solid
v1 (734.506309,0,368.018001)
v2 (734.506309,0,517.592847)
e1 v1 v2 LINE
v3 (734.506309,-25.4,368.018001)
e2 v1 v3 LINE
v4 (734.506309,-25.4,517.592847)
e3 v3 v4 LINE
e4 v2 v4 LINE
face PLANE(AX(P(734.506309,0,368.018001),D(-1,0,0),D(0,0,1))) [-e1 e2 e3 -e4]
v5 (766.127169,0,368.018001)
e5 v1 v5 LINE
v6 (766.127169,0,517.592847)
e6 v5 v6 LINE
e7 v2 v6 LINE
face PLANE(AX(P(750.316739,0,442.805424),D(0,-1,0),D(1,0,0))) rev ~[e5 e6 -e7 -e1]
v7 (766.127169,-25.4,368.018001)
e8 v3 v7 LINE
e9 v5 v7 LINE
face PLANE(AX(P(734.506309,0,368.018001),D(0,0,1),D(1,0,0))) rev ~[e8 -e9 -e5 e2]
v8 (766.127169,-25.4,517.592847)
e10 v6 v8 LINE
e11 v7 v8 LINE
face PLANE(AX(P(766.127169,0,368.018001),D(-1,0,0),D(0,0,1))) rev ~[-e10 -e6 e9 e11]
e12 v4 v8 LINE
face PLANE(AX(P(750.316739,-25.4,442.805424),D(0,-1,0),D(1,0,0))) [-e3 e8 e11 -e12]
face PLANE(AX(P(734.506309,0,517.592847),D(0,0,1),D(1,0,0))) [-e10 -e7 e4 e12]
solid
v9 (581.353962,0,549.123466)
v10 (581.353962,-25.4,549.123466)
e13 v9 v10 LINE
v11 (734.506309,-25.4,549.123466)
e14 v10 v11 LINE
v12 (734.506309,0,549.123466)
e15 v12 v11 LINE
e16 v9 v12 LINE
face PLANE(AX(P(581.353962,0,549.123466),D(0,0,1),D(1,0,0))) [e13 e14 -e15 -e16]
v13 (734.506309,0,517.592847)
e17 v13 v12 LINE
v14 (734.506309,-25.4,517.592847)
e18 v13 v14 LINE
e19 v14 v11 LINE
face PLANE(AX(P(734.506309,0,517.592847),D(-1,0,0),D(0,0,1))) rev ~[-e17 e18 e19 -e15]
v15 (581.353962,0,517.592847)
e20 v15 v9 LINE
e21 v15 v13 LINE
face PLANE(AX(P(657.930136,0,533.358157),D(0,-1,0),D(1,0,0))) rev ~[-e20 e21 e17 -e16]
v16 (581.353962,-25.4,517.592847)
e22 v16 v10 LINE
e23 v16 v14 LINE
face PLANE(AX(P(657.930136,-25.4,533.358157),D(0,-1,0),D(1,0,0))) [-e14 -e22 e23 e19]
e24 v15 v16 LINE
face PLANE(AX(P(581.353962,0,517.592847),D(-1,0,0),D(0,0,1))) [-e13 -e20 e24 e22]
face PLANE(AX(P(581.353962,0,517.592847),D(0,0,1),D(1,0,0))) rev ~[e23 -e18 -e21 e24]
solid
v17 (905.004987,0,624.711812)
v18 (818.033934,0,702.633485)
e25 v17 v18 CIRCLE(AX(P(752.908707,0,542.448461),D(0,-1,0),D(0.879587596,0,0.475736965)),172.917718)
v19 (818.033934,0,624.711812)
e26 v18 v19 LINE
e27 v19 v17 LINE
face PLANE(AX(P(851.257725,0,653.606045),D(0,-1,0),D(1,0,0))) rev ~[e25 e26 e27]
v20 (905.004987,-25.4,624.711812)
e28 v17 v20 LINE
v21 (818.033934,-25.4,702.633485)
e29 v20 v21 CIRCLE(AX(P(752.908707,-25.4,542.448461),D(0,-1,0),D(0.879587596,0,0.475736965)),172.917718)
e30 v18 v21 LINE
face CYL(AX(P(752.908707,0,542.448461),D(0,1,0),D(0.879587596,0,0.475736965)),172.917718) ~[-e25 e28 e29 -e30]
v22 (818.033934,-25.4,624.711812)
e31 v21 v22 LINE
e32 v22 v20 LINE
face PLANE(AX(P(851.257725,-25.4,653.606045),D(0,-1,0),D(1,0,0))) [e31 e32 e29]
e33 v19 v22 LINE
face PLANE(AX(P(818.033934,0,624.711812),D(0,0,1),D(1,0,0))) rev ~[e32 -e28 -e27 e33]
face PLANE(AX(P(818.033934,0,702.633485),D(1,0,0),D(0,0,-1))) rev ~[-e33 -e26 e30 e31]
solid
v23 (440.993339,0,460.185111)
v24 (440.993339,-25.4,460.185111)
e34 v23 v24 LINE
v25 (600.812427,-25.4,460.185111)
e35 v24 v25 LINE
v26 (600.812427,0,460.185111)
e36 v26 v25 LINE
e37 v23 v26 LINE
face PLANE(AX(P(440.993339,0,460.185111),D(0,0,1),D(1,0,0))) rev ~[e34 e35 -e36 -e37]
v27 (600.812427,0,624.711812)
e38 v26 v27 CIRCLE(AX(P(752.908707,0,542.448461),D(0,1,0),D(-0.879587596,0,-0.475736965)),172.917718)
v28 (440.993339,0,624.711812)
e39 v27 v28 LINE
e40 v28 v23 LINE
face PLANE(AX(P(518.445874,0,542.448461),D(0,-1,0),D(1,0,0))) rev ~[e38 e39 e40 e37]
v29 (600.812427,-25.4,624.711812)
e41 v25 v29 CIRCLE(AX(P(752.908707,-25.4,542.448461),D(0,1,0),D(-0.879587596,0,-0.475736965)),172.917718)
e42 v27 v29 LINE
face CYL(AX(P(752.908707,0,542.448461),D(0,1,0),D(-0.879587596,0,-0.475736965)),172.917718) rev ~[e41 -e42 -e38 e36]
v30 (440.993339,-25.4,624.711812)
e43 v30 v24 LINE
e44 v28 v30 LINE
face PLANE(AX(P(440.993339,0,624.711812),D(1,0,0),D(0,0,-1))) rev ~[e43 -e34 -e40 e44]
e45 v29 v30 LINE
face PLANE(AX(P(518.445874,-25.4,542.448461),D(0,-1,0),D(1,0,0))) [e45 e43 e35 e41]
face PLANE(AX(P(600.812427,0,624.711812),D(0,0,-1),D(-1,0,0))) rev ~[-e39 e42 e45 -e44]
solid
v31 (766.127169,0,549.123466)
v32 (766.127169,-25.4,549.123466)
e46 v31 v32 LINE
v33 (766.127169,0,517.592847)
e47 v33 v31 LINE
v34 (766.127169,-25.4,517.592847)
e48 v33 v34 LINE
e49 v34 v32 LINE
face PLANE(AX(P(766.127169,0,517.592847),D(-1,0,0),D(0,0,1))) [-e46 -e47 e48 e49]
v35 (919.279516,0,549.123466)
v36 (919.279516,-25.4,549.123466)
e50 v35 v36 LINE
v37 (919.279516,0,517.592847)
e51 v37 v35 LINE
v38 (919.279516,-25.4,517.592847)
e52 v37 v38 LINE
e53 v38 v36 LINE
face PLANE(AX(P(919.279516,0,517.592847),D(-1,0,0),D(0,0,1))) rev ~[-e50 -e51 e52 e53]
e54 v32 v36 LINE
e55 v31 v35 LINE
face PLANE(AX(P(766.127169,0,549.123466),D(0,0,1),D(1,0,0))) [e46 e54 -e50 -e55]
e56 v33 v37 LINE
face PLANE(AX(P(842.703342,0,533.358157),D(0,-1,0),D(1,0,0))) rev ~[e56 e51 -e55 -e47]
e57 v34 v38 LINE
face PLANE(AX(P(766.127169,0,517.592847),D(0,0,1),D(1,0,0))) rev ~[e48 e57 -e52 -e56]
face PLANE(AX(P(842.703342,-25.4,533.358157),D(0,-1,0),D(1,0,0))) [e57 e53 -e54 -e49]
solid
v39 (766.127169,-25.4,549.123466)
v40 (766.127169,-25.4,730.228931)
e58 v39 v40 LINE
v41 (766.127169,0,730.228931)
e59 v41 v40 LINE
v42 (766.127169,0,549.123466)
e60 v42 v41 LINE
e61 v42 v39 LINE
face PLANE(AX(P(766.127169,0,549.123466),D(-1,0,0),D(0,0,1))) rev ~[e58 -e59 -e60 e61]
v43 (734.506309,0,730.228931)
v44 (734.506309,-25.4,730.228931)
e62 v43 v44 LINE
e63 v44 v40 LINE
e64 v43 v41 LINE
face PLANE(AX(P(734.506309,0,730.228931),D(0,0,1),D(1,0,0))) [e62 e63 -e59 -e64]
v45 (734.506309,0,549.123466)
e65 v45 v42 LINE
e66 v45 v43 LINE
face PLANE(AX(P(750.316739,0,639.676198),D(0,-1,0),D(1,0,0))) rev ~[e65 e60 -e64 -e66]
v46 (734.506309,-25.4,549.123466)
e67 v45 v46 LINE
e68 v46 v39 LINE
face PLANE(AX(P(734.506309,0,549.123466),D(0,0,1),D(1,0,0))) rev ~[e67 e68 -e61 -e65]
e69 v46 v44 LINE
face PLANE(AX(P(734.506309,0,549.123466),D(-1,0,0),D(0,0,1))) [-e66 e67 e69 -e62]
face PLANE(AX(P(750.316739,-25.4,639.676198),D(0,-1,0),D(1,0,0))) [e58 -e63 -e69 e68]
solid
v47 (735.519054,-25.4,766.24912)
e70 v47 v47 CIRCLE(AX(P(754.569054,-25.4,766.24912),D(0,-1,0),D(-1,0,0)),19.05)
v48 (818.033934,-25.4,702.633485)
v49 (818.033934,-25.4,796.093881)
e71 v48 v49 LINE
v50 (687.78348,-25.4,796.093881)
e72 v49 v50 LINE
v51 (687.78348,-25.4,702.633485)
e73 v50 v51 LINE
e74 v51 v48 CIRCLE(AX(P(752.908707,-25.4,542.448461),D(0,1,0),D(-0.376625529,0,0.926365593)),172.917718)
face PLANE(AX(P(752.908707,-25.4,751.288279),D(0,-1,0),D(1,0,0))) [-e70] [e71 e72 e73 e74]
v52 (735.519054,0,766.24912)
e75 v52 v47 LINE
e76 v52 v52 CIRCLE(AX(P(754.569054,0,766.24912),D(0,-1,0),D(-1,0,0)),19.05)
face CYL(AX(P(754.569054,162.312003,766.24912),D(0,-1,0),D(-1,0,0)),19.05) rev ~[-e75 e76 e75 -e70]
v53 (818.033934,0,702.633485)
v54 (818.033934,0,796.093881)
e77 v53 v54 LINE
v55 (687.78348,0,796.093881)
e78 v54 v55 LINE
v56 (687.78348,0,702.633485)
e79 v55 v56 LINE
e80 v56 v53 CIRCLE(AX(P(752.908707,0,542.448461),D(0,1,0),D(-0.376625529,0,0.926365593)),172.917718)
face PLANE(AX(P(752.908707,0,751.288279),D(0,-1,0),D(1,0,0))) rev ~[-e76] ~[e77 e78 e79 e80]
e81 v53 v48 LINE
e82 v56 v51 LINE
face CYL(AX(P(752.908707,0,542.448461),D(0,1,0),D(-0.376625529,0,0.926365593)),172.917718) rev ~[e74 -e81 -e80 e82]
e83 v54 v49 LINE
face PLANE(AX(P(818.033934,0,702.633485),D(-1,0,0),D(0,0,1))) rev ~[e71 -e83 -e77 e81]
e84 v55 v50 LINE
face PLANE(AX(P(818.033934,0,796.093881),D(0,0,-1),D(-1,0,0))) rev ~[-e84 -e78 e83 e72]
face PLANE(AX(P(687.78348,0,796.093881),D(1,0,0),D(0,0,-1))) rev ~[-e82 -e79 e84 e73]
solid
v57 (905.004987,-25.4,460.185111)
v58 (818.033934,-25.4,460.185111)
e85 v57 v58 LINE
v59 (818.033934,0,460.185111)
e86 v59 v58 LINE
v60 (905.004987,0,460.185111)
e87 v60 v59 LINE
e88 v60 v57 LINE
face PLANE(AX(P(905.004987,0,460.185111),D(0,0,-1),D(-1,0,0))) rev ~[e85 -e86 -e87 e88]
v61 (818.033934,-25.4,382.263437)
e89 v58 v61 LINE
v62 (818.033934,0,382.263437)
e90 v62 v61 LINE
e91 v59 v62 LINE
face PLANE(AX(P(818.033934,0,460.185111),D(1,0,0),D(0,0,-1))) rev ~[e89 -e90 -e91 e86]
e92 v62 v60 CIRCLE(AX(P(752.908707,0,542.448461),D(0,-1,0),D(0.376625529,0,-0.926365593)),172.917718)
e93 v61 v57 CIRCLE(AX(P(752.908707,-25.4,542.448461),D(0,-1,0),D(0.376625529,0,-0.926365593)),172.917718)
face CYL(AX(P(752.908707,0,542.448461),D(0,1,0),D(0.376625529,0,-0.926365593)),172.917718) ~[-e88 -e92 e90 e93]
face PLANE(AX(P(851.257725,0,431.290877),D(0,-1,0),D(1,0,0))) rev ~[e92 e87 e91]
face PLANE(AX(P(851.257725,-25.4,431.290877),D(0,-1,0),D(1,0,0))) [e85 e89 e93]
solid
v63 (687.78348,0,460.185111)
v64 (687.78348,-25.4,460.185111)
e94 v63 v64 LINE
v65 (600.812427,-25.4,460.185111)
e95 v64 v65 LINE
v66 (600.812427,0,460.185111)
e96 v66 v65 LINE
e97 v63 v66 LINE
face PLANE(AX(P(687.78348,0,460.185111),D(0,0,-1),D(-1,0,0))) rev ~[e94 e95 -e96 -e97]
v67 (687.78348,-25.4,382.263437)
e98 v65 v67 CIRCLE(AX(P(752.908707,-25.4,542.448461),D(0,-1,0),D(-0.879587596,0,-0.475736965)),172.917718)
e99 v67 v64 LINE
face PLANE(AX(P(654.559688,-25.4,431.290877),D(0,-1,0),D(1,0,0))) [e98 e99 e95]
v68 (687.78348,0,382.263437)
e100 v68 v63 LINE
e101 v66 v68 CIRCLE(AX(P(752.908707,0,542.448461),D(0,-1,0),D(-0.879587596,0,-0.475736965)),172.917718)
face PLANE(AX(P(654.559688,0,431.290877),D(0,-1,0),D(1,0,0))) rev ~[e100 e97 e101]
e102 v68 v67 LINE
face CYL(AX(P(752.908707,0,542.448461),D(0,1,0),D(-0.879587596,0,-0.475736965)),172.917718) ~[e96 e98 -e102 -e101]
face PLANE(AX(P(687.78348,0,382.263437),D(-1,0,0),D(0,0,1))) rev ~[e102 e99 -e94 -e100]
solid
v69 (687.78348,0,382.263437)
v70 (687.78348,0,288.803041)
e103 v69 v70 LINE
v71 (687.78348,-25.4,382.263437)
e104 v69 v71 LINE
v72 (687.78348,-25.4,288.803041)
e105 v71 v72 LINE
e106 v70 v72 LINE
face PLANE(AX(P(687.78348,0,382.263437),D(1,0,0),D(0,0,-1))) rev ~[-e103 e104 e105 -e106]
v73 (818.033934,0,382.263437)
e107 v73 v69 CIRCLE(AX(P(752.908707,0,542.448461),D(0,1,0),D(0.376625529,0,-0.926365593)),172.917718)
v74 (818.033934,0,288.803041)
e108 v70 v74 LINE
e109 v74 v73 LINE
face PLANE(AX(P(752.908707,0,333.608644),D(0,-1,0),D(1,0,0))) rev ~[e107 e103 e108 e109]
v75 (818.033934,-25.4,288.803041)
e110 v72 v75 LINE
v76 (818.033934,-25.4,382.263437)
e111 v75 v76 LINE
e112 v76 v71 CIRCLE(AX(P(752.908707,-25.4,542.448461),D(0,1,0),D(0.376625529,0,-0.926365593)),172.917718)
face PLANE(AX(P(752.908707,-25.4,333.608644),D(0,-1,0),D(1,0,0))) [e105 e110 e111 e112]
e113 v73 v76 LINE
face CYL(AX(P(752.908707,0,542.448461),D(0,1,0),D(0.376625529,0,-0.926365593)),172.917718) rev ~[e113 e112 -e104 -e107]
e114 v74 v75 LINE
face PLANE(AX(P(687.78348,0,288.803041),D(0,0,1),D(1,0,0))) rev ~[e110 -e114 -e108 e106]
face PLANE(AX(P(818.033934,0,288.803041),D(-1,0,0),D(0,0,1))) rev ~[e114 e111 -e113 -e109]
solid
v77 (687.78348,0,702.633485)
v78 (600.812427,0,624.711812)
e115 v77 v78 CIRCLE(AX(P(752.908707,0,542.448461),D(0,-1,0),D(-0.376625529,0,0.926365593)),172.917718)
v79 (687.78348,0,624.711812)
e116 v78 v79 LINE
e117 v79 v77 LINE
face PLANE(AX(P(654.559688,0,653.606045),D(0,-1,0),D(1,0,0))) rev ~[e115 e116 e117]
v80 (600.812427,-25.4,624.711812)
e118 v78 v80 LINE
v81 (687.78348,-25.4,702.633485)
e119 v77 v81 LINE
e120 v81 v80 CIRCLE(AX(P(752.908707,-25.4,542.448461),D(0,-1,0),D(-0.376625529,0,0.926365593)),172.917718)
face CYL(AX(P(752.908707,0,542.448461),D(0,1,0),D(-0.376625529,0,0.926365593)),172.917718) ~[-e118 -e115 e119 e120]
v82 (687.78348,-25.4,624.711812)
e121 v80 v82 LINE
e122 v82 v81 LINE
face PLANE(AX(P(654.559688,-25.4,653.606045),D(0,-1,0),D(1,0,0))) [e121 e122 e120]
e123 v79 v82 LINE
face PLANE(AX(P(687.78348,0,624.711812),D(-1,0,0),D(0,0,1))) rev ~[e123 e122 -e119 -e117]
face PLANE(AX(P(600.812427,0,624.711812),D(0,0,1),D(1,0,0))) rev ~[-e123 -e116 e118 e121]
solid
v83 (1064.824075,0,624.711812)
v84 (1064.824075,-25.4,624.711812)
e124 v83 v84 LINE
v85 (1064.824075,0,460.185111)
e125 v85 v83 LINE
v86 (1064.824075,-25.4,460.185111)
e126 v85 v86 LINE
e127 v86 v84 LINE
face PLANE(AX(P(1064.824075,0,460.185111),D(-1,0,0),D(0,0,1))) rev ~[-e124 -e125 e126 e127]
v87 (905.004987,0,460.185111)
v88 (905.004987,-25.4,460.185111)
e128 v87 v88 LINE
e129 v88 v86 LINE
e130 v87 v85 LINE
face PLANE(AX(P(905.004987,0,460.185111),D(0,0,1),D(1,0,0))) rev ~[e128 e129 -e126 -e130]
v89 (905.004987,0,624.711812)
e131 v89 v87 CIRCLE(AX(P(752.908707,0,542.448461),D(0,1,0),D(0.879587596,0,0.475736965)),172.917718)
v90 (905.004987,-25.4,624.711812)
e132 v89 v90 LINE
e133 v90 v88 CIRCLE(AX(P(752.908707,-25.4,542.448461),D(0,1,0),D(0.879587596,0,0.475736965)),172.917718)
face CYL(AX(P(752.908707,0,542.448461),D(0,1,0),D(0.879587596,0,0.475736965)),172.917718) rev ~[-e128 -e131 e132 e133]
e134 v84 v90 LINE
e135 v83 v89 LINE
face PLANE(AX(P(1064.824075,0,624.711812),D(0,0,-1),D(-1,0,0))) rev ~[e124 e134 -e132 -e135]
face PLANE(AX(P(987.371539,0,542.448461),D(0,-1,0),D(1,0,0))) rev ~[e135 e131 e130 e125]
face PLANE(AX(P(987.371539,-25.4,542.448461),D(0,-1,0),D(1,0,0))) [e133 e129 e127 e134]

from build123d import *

# Parameters (mm, degrees)
F1_DEPTH = 25.4
F2_W     = 31.6208600998
F2_H     = 149.5748460293
F3_DEPTH = 25.4
F2_H_2   = 181.1054646969
F2_W_2   = 153.152346611
F2_H_3   = 31.5306186676
F5_D     = 38.1


with BuildPart() as f1:
    # F0 (on Front) → F1 (new body)
    with BuildSketch(Plane.XZ):
        with BuildLine():
            Line((818.0339336395, 288.8030409813), (818.0339336395, 382.2634366477))
            ThreePointArc((818.0339336395, 382.2634366477), (752.908706665, 369.5307429552), (687.7834796906, 382.2634366477))
            Line((687.7834796906, 382.2634366477), (687.7834796906, 288.8030409813))
            Line((687.7834796906, 288.8030409813), (818.0339336395, 288.8030409813))
        make_face()
    extrude(amount=F1_DEPTH)


with BuildPart() as f1b:
    # F0 (on Front) → F1, piece 2 (new body)
    with BuildSketch(Plane.XZ):
        with BuildLine():
            ThreePointArc((600.8124266323, 460.185110569), (579.9909885645, 542.4484610558), (600.8124266323, 624.7118115425))
            Line((600.8124266323, 624.7118115425), (440.9933388233, 624.7118115425))
            Line((440.9933388233, 624.7118115425), (440.9933388233, 460.185110569))
            Line((440.9933388233, 460.185110569), (600.8124266323, 460.185110569))
        make_face()
    extrude(amount=F1_DEPTH)


with BuildPart() as f1c:
    # F0 (on Front) → F1, piece 3 (new body)
    with BuildSketch(Plane.XZ):
        with BuildLine():
            ThreePointArc((600.8124266323, 460.185110569), (637.5213477678, 413.6606718838), (687.7834796906, 382.2634366477))
            Line((687.7834796906, 382.2634366477), (687.7834796906, 460.185110569))
            Line((687.7834796906, 460.185110569), (600.8124266323, 460.185110569))
        make_face()
    extrude(amount=F1_DEPTH)


with BuildPart() as f1d:
    # F0 (on Front) → F1, piece 4 (new body)
    with BuildSketch(Plane.XZ):
        with BuildLine():
            ThreePointArc((905.0049866977, 624.7118115425), (920.5402653107, 584.8771987123), (925.8264247656, 542.4484610558))
            ThreePointArc((925.8264247656, 542.4484610558), (920.5402653107, 500.0197233992), (905.0049866977, 460.185110569))
            Line((905.0049866977, 460.185110569), (1064.8240745068, 460.185110569))
            Line((1064.8240745068, 460.185110569), (1064.8240745068, 624.7118115425))
            Line((1064.8240745068, 624.7118115425), (905.0049866977, 624.7118115425))
        make_face()
    extrude(amount=F1_DEPTH)


with BuildPart() as f1e:
    # F0 (on Front) → F1, piece 5 (new body)
    with BuildSketch(Plane.XZ):
        with BuildLine():
            ThreePointArc((818.0339336395, 382.2634366477), (868.2960655623, 413.6606718838), (905.0049866977, 460.185110569))
            Line((905.0049866977, 460.185110569), (818.0339336395, 460.185110569))
            Line((818.0339336395, 460.185110569), (818.0339336395, 382.2634366477))
        make_face()
    extrude(amount=F1_DEPTH)


with BuildPart() as f1f:
    # F0 (on Front) → F1, piece 6 (new body)
    with BuildSketch(Plane.XZ):
        with BuildLine():
            Line((687.7834796906, 624.7118115425), (687.7834796906, 702.6334854638))
            ThreePointArc((687.7834796906, 702.6334854638), (637.5213477678, 671.2362502277), (600.8124266323, 624.7118115425))
            Line((600.8124266323, 624.7118115425), (687.7834796906, 624.7118115425))
        make_face()
    extrude(amount=F1_DEPTH)


with BuildPart() as f1g:
    # F0 (on Front) → F1, piece 7 (new body)
    with BuildSketch(Plane.XZ):
        with BuildLine():
            ThreePointArc((687.7834796906, 702.6334854638), (752.908706665, 715.3661791563), (818.0339336395, 702.6334854638))
            Line((818.0339336395, 702.6334854638), (818.0339336395, 796.0938811302))
            Line((818.0339336395, 796.0938811302), (687.7834796906, 796.0938811302))
            Line((687.7834796906, 796.0938811302), (687.7834796906, 702.6334854638))
        make_face()
    extrude(amount=F1_DEPTH)

    # F5 (through all)
    with Locations(Plane(origin=(0, 0, 0), x_dir=(1, 0, 0), z_dir=(0, 1, 0))):
        with Locations((754.5690536499, -766.2491202354)):
            Hole(F5_D / 2)


with BuildPart() as f1h:
    # F0 (on Front) → F1, piece 8 (new body)
    with BuildSketch(Plane.XZ):
        with BuildLine():
            Line((818.0339336395, 624.7118115425), (905.0049866977, 624.7118115425))
            ThreePointArc((905.0049866977, 624.7118115425), (868.2960655623, 671.2362502277), (818.0339336395, 702.6334854638))
            Line((818.0339336395, 702.6334854638), (818.0339336395, 624.7118115425))
        make_face()
    extrude(amount=F1_DEPTH)


with BuildPart() as f3:
    # F2 (on Front) → F3 (new body)
    with BuildSketch(Plane.XZ):
        with Locations((750.3167390823, 442.8054243326)):
            Rectangle(F2_W, F2_H)
    extrude(amount=F3_DEPTH)


with BuildPart() as f3b:
    # F2 (on Front) → F3, piece 2 (new body)
    with BuildSketch(Plane.XZ):
        with Locations((750.3167390823, 639.6761983633)):
            Rectangle(F2_W, F2_H_2)
    extrude(amount=F3_DEPTH)


with BuildPart() as f3c:
    # F2 (on Front) → F3, piece 3 (new body)
    with BuildSketch(Plane.XZ):
        with Locations((842.7033424377, 533.3581566811)):
            Rectangle(F2_W_2, F2_H_3)
    extrude(amount=F3_DEPTH)


with BuildPart() as f3d:
    # F2 (on Front) → F3, piece 4 (new body)
    with BuildSketch(Plane.XZ):
        with Locations((657.9301357269, 533.3581566811)):
            Rectangle(F2_W_2, F2_H_3)
    extrude(amount=F3_DEPTH)


solid = Compound([f1.part, f1b.part, f1c.part, f1d.part, f1e.part, f1f.part, f1g.part, f1h.part, f3.part, f3b.part, f3c.part, f3d.part])
